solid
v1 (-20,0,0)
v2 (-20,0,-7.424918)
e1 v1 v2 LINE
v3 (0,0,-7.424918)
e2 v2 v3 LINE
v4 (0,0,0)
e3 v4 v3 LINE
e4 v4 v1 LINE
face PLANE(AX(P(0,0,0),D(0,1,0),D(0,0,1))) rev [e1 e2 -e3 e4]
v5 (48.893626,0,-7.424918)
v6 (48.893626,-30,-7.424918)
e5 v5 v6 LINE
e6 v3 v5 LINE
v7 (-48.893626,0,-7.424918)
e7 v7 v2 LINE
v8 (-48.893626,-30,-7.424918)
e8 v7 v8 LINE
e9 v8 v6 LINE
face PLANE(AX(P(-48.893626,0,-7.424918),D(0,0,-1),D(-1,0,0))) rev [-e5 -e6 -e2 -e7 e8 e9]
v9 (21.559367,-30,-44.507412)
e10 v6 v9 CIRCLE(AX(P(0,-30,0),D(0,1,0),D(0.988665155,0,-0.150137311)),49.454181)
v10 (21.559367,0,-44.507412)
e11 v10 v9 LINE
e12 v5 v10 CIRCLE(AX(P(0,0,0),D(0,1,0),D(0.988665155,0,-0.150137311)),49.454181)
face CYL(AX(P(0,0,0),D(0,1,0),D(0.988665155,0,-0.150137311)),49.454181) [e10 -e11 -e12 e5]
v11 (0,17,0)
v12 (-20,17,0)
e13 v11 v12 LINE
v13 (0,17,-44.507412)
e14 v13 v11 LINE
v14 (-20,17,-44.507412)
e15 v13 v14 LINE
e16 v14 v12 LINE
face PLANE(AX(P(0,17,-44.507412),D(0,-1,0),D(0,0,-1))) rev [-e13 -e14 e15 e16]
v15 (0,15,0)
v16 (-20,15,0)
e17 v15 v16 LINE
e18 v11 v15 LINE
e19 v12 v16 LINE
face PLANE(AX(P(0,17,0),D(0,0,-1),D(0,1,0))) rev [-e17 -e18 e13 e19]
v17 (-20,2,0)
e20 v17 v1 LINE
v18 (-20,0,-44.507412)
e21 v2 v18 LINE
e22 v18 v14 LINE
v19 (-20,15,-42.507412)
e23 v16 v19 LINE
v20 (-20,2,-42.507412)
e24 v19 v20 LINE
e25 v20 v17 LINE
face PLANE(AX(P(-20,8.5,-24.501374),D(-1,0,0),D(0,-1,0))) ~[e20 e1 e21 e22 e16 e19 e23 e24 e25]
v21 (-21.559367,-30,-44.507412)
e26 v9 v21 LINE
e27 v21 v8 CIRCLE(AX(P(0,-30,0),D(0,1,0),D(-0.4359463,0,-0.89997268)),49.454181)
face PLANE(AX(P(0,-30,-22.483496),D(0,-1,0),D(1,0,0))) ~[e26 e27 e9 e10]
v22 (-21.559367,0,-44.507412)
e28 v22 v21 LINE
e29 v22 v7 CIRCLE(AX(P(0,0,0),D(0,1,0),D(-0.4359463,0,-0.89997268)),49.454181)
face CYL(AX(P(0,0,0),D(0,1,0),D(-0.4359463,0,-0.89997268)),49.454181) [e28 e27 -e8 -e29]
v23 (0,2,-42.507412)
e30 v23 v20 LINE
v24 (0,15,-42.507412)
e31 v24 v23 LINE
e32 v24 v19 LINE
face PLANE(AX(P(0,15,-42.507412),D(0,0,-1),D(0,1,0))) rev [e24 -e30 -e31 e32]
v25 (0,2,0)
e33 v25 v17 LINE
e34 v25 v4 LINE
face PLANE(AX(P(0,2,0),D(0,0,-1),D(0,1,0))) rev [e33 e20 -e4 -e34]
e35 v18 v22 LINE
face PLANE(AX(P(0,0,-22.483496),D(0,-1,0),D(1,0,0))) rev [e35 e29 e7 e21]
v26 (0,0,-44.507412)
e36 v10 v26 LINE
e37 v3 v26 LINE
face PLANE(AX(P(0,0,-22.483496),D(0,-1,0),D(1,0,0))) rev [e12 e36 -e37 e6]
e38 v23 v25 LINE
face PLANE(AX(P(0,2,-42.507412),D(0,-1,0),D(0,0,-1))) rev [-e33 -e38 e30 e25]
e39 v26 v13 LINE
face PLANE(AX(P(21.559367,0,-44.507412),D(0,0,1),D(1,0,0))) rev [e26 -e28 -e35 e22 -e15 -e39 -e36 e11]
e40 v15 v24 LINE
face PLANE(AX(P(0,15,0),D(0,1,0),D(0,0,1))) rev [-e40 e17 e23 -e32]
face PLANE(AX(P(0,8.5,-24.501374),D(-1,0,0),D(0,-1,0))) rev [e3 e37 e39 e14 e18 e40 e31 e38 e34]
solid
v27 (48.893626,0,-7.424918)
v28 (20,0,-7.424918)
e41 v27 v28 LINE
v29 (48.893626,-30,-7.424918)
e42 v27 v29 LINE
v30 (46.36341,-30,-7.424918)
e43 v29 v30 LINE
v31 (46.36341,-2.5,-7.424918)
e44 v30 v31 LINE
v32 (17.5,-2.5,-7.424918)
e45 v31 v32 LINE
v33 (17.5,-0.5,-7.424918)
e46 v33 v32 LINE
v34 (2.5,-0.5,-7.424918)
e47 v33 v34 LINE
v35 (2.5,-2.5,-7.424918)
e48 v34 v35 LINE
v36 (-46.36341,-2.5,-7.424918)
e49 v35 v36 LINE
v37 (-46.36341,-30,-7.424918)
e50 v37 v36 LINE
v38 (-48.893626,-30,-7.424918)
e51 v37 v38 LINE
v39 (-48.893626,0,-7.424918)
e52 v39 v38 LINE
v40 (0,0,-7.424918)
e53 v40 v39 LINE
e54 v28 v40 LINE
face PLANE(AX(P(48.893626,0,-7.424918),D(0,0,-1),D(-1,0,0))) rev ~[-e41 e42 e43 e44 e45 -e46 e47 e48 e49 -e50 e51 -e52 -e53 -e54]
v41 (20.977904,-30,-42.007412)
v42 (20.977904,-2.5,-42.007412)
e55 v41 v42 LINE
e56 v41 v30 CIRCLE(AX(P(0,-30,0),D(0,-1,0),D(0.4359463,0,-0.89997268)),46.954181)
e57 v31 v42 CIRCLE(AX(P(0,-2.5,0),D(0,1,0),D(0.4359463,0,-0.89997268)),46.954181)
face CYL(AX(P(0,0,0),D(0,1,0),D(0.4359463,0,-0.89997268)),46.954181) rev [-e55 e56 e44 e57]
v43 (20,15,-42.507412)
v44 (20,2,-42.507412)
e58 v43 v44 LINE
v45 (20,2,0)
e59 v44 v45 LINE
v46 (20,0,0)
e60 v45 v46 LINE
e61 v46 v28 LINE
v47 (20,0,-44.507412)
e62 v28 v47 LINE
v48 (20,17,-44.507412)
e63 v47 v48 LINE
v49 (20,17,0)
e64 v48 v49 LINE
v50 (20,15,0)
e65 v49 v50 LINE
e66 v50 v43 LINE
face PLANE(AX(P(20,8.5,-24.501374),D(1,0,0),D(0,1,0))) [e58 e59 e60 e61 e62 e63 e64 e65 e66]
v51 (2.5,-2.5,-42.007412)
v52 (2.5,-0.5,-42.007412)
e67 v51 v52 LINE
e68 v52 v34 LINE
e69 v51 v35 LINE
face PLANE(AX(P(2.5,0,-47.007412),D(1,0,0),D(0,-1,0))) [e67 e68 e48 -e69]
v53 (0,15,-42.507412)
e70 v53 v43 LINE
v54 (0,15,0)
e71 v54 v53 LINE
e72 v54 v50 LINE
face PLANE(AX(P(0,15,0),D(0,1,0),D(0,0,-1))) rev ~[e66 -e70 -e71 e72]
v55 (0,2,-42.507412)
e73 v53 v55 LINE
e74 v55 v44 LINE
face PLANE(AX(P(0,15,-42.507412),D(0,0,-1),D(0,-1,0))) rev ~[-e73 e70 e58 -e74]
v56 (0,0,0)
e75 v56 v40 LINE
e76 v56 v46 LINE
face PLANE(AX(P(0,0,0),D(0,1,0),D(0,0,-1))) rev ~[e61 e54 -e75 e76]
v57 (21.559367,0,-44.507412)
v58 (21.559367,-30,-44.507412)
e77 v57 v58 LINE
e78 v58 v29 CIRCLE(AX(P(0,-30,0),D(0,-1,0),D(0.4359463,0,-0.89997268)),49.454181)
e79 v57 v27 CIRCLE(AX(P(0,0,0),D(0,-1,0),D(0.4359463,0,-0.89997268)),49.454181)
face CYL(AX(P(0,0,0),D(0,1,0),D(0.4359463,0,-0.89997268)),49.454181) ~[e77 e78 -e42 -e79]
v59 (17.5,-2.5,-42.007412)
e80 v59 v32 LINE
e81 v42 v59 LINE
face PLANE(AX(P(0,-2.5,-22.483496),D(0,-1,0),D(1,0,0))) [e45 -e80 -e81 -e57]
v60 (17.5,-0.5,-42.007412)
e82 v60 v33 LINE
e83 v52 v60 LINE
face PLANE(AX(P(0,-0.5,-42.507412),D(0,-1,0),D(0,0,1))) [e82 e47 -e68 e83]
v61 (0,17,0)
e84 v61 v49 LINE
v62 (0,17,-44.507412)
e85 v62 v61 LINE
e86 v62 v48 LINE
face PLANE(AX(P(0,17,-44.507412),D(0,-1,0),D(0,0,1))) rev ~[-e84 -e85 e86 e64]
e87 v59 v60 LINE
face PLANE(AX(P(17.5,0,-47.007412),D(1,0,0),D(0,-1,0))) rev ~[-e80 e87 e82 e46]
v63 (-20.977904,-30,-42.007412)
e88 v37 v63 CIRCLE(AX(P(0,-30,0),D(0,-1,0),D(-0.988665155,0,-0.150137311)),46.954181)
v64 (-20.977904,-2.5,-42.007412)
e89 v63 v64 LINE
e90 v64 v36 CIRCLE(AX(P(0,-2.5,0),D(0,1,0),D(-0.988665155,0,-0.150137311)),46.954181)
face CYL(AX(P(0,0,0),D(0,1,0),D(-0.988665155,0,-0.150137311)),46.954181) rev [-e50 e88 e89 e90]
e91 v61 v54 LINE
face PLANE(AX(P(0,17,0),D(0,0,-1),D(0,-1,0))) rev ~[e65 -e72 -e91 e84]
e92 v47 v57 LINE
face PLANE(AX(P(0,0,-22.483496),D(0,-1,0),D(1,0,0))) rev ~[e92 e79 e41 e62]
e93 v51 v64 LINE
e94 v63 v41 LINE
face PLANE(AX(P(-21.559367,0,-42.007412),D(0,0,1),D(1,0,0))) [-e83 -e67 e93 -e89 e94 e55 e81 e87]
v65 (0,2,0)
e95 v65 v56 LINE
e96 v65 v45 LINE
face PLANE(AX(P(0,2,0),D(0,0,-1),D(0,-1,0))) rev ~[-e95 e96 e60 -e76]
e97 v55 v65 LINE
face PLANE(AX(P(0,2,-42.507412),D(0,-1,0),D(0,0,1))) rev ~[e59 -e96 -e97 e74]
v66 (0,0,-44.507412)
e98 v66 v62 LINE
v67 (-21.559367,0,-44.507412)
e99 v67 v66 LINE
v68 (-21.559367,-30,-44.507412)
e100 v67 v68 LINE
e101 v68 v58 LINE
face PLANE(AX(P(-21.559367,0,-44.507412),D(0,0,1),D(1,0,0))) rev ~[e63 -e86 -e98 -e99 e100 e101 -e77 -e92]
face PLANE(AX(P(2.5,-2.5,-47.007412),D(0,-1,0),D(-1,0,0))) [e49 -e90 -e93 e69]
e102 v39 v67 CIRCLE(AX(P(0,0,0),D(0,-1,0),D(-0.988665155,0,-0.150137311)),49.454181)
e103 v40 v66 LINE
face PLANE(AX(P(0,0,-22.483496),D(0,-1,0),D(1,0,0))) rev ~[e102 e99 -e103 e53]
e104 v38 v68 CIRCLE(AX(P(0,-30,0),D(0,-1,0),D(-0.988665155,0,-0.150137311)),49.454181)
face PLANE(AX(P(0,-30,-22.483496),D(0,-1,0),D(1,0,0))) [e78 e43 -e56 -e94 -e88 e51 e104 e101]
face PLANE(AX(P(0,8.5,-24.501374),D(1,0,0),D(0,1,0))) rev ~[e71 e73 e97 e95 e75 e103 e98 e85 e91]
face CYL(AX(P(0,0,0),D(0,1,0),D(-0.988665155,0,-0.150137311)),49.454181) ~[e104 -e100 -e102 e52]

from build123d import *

# Parameters (mm, degrees)
F2_DEPTH    = 20
F3_DEPTH    = 30
F5_T        = 2.5
F5_T3_DEPTH = 42.0824943232
F5_T5_DEPTH = 25


# Not quite as in the source:
# - a shell that OpenCascade refuses in one call is made with other operations: the cavity is built on its own and cut out


with BuildPart() as f2:
    # F1 (on Right) → F2 (new body)
    with BuildSketch(Plane.YZ):
        Polygon((0, 0), (0, -44.507412108), (17, -44.507412108), (17, 0), (15, 0), (15, -42.507412108), (2, -42.507412108), (2, 0), align=None)
    extrude(amount=F2_DEPTH)

    # F0 (on Front) → F3 (join)
    with BuildSketch(Plane.XZ):
        with BuildLine():
            Line((48.8936258571, -7.4249177848), (-48.8936258571, -7.4249177848))
            ThreePointArc((-48.8936258571, -7.4249177848), (-39.8080884955, -29.3433492277), (-21.5593673613, -44.507412108))
            Line((-21.5593673613, -44.507412108), (21.5593673613, -44.507412108))
            ThreePointArc((21.5593673613, -44.507412108), (39.8080884955, -29.3433492277), (48.8936258571, -7.4249177848))
        make_face()
    extrude(amount=F3_DEPTH)


with BuildPart() as f4_1:
    # F4: instance of F2
    add(f2.part.mirror(Plane.YZ))


with BuildPart() as f2_1:
    add(f2.part)

    # F5: shell of thickness 2.5, made by hand


with BuildPart() as f5_core1:
    # F5_t2: copy of F2
    add(f2_1.part)

    # the walls: a layer under each face that stays
    f5_faces = [f5_core1.faces().sort_by_distance(p)[0] for p in [
        (10, 0, -3.7124588924),
        (0, 1.2142857143, -41.3283112431),
        (20, 1.2142857143, -41.3283112431),
        (10, 1, 0),
        (-24.4468129286, 0, -25.9661649464),
        (0, -6.5, -44.507412108),
        (10, 17, -22.253706054),
        (10, 16, 0),
        (10, 15, -21.253706054),
        (10, 8.5, -42.507412108),
        (10, 2, -21.253706054),
        (39.8080884955, -15, -29.3433492277),
        (-39.8080884955, -15, -29.3433492277),
        (34.4468129286, 0, -25.9661649464),
    ]]
    thicken(f5_faces, amount=-F5_T, mode=Mode.SUBTRACT)

    # F5_s4 → F5_t3 (cut)
    with BuildSketch(Plane.XY.offset(-47.007412108)):
        Polygon((-0.025, 0.025), (2.5, 0), (2.5, -2.5), (0, -2.5), align=None)
        Polygon((20.025, 0.025), (17.5, 0), (17.5, -2.5), (20, -2.5), align=None)
    extrude(amount=F5_T3_DEPTH, mode=Mode.SUBTRACT)

    # F5_s6 → F5_t5 (cut)
    with BuildSketch(Plane.YZ.offset(-2.5)):
        Polygon((14.975, -42.482412108), (17.5, -42.507412108), (17.5, -45.007412108), (15, -45.007412108), align=None)
        Polygon((2.025, -42.482412108), (2, -45.007412108), (-0.5, -45.007412108), (-0.5, -42.507412108), align=None)
    extrude(amount=F5_T5_DEPTH, mode=Mode.SUBTRACT)


with BuildPart() as f2_2:
    add(f2_1.part)

    # what is left inside the walls is the cavity
    f5_cavity = [f5_core1.part.solids().sort_by_distance(p)[0] for p in [
        (0, -29.975, -30.479914),
    ]]
    add(f5_cavity, mode=Mode.SUBTRACT)


solid = Compound([f4_1.part, f2_2.part])
